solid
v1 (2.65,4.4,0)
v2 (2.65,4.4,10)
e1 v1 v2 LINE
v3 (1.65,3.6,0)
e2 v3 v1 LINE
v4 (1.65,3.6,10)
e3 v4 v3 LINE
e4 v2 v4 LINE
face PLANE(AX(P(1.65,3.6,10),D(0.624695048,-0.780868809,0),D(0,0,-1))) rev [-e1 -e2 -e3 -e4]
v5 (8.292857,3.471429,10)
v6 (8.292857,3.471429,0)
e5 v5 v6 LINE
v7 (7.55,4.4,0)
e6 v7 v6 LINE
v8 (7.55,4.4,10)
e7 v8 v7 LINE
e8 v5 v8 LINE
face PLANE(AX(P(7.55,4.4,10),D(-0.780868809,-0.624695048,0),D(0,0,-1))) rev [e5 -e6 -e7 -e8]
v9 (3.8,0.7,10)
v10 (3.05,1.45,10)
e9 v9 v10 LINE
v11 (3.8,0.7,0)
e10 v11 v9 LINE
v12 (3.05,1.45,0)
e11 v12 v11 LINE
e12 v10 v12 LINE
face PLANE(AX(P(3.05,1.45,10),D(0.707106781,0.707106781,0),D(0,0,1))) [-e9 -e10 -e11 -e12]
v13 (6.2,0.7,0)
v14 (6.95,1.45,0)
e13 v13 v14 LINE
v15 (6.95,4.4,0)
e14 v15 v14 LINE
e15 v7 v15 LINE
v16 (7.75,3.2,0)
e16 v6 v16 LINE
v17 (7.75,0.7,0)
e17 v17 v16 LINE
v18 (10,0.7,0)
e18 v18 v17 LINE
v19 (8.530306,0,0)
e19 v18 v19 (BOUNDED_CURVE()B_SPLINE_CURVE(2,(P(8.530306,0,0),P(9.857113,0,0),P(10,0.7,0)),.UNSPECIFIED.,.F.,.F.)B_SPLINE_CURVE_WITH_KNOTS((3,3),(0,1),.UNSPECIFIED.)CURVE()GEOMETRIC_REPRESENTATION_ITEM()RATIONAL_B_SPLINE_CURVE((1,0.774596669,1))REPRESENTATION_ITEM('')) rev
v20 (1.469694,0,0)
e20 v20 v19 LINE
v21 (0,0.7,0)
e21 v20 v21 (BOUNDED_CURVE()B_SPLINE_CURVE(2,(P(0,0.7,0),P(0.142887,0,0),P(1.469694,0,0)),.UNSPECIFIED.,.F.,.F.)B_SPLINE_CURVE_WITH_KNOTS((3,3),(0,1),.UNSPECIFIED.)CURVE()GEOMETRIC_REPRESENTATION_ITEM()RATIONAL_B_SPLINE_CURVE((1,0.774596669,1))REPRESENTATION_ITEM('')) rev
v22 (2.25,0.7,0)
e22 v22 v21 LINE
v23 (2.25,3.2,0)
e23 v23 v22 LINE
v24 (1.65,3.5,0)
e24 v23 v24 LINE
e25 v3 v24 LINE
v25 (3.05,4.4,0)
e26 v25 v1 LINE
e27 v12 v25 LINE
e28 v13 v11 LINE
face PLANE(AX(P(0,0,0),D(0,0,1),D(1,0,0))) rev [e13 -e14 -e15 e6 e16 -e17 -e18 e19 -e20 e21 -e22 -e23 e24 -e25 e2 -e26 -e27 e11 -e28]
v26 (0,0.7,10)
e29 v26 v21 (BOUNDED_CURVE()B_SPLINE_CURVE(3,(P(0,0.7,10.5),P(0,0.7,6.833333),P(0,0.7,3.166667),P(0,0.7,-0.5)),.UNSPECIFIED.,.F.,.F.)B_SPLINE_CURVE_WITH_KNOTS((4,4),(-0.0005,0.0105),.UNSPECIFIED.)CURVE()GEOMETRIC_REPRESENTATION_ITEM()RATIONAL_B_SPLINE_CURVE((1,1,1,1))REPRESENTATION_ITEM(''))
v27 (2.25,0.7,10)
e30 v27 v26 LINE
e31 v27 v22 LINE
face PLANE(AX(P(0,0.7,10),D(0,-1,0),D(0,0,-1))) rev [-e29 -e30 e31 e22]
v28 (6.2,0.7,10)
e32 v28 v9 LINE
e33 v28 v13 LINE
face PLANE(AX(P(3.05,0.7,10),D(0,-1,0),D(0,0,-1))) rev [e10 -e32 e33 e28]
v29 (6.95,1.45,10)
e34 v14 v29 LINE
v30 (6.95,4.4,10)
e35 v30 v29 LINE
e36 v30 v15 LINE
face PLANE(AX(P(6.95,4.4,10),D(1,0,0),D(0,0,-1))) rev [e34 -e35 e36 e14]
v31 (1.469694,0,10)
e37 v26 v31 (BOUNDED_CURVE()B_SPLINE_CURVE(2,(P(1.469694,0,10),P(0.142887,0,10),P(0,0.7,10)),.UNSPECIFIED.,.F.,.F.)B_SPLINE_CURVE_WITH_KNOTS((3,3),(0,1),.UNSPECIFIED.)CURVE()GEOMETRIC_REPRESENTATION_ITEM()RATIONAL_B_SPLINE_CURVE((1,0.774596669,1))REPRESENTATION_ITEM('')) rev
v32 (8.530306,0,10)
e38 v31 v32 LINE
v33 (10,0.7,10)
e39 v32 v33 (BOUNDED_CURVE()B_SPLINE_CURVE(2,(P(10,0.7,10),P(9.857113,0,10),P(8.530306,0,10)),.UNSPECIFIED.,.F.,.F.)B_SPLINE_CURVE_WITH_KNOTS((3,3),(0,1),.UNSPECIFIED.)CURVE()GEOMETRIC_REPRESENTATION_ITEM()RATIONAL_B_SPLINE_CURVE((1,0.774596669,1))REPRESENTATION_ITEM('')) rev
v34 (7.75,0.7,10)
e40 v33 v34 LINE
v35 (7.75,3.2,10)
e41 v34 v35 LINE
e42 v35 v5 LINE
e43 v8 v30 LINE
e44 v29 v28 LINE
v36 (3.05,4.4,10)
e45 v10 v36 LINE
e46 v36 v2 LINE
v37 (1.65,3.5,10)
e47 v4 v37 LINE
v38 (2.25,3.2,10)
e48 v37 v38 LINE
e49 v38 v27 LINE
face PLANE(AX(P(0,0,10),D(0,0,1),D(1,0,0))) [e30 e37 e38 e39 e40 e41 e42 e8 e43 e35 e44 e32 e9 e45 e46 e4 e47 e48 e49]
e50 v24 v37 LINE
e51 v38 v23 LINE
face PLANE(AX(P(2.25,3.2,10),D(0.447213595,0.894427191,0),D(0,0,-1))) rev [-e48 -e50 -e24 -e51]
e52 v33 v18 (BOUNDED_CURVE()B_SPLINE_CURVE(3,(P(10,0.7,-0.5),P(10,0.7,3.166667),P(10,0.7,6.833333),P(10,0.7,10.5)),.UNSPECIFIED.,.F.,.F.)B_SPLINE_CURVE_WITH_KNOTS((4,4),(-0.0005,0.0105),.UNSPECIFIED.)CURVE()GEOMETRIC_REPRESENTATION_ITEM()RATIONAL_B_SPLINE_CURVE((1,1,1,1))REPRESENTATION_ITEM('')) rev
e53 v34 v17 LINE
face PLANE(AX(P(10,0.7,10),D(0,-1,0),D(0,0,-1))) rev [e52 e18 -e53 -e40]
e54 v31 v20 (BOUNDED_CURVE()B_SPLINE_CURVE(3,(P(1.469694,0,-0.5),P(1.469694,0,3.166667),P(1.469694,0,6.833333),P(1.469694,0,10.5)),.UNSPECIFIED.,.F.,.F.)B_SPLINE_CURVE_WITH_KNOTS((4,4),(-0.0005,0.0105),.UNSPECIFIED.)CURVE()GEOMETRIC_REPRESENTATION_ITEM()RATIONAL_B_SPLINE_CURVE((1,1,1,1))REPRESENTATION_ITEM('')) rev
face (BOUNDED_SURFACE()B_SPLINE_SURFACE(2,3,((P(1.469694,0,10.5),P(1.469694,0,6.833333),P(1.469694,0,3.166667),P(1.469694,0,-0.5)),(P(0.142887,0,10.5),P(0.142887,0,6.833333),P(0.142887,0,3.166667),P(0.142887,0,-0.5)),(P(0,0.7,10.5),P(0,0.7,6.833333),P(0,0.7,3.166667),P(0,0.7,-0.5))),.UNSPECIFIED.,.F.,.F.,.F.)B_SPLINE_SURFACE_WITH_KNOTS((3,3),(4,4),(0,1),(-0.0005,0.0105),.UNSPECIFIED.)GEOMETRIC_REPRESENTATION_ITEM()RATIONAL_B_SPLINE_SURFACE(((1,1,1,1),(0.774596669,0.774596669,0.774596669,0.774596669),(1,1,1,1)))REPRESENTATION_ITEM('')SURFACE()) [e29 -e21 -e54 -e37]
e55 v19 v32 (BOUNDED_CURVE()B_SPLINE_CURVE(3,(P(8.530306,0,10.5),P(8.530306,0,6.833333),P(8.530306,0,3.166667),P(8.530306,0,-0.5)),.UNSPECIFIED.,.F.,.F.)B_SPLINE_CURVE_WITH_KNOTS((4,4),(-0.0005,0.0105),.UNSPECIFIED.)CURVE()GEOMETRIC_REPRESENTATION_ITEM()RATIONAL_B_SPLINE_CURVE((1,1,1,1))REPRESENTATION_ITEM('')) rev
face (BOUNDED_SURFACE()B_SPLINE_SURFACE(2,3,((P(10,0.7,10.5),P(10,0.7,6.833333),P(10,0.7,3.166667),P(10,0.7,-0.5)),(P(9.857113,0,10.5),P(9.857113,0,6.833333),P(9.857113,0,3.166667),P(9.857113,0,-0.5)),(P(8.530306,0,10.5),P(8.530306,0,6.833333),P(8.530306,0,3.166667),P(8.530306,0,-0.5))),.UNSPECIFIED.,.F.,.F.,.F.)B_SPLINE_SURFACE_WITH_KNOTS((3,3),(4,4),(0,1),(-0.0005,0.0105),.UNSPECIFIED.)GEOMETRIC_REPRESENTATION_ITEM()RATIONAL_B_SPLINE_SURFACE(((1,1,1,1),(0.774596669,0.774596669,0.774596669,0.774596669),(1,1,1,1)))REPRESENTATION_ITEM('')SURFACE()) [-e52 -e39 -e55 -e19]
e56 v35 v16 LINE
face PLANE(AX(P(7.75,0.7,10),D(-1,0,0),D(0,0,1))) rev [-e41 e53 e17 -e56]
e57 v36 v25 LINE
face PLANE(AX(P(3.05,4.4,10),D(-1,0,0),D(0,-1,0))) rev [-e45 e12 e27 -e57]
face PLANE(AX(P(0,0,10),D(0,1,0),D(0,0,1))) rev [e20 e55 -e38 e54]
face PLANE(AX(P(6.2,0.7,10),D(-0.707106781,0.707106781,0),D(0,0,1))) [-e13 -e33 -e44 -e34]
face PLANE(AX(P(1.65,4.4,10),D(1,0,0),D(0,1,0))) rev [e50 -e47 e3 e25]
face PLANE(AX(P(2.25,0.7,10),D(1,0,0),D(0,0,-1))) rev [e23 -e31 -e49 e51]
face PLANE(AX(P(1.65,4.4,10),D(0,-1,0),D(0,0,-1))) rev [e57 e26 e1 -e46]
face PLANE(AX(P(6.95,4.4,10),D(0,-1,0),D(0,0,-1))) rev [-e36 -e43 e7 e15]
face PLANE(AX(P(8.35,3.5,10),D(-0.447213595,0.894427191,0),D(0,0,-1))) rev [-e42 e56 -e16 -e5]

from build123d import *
from OCP.BRepFilletAPI import BRepFilletAPI_MakeChamfer

# Parameters (mm, degrees)
BOSS_EXTRUDE1_DEPTH = 10
FILLET1_START       = -1
FILLET1_DEPTH       = 12
FILLET2_SIZE        = 1
FILLET2_SIZE2       = 0.8
FILLET3_SIZE        = 0.3
FILLET3_SIZE_2      = 0.6
FILLET4_SIZE        = 0.75


with BuildPart() as part:
    # Sketch1 → Boss-Extrude1 (new body)
    with BuildSketch(Plane.XY):
        Polygon((0, 0), (0, 0.7), (2.25, 0.7), (2.25, 3.2), (1.65, 3.2), (1.65, 4.4), (3.05, 4.4), (3.05, 0.7), (6.95, 0.7), (6.95, 4.4), (8.35, 4.4), (8.35, 3.2), (7.75, 3.2), (7.75, 0.7), (10, 0.7), (10, 0), align=None)
    extrude(amount=BOSS_EXTRUDE1_DEPTH)

    # Fillet1: read off the stored shape, not the designer's step
    # Fillet1 outline → Fillet1 (cut)
    with BuildSketch(Plane.XY.offset(FILLET1_START)):
        with BuildLine():
            Line((0, 0), (1.469693846, 0))
            add(Edge.make_bspline(
                [(1.469693846, 0), (0.142886902, 0), (0, 0.7)],
                knots=[0, 0, 0, 1, 1, 1], degree=2, weights=[1, 0.774596669, 1]))
            Line((0, 0.7), (0, 0))
        make_face()
        with BuildLine():
            add(Edge.make_bspline(
                [(10, 0.7), (9.857113098, 0), (8.530306154, 0)],
                knots=[0, 0, 0, 1, 1, 1], degree=2, weights=[1, 0.774596669, 1]))
            Line((8.530306154, 0), (10, 0))
            Line((10, 0), (10, 0.7))
        make_face()
    extrude(amount=FILLET1_DEPTH, mode=Mode.SUBTRACT)

    # Fillet2: one chamfer whose edges measure the first distance from different faces: ONE call of the kernel's chamfer builder (chamfer() names one face for all edges)
    fillet2_edges_1 = [part.edges().sort_by_distance(p)[0] for p in [
        (1.65, 4.4, 5),
    ]]
    fillet2_side_1 = [part.faces().sort_by_distance(p)[0] for p in [
        (2.35, 4.4, 5),
    ]]
    fillet2_edges_2 = [part.edges().sort_by_distance(p)[0] for p in [
        (8.35, 4.4, 5),
    ]]
    fillet2_side_2 = [part.faces().sort_by_distance(p)[0] for p in [
        (8.35, 3.8, 5),
    ]]
    fillet2 = BRepFilletAPI_MakeChamfer(part.part.solid().wrapped)
    for e in fillet2_edges_1:
        fillet2.Add(FILLET2_SIZE, FILLET2_SIZE2, e.wrapped, fillet2_side_1[0].wrapped)  # the first distance lies on this face
    for e in fillet2_edges_2:
        fillet2.Add(FILLET2_SIZE, FILLET2_SIZE2, e.wrapped, fillet2_side_2[0].wrapped)  # the first distance lies on this face
    add(Compound.cast(fillet2.Shape()), mode=Mode.REPLACE)

    # Fillet3
    # the kernel refuses this chamfer: 0.6, 0.3 mm, written as the material it takes off along each edge
    with BuildSketch(Plane(origin=(1.65, 3.2, -1.553897324), x_dir=(0, 1, 0), z_dir=(0, 0, 1))) as fillet3_piece_1_section:
        Polygon((FILLET3_SIZE, 0), (0, -FILLET3_SIZE_2), (0, 0), align=None)
    fillet3_piece_1 = extrude(amount=13.107794649, mode=Mode.PRIVATE)
    fillet3_piece_1 = split(fillet3_piece_1, bisect_by=Plane(origin=(2.25, 3.2, -1.553897324), z_dir=(-1, 0, 0)), keep=Keep.TOP, mode=Mode.PRIVATE)
    add(fillet3_piece_1, mode=Mode.SUBTRACT)
    with BuildSketch(Plane(origin=(8.35, 3.2, -1.553897324), x_dir=(0, 1, 0), z_dir=(0, 0, 1))) as fillet3_piece_2_section:
        Polygon((FILLET3_SIZE, 0), (0, FILLET3_SIZE_2), (0, 0), align=None)
    fillet3_piece_2 = extrude(amount=13.107794649, mode=Mode.PRIVATE)
    fillet3_piece_2 = split(fillet3_piece_2, bisect_by=Plane(origin=(7.75, 3.2, -1.553897324), z_dir=(1, 0, 0)), keep=Keep.TOP, mode=Mode.PRIVATE)
    add(fillet3_piece_2, mode=Mode.SUBTRACT)

    # Fillet4
    fillet4_edges = [part.edges().sort_by_distance(p)[0] for p in [
        (3.05, 0.7, 5),
        (6.95, 0.7, 5),
    ]]
    chamfer(fillet4_edges, length=FILLET4_SIZE)


solid = part.part
